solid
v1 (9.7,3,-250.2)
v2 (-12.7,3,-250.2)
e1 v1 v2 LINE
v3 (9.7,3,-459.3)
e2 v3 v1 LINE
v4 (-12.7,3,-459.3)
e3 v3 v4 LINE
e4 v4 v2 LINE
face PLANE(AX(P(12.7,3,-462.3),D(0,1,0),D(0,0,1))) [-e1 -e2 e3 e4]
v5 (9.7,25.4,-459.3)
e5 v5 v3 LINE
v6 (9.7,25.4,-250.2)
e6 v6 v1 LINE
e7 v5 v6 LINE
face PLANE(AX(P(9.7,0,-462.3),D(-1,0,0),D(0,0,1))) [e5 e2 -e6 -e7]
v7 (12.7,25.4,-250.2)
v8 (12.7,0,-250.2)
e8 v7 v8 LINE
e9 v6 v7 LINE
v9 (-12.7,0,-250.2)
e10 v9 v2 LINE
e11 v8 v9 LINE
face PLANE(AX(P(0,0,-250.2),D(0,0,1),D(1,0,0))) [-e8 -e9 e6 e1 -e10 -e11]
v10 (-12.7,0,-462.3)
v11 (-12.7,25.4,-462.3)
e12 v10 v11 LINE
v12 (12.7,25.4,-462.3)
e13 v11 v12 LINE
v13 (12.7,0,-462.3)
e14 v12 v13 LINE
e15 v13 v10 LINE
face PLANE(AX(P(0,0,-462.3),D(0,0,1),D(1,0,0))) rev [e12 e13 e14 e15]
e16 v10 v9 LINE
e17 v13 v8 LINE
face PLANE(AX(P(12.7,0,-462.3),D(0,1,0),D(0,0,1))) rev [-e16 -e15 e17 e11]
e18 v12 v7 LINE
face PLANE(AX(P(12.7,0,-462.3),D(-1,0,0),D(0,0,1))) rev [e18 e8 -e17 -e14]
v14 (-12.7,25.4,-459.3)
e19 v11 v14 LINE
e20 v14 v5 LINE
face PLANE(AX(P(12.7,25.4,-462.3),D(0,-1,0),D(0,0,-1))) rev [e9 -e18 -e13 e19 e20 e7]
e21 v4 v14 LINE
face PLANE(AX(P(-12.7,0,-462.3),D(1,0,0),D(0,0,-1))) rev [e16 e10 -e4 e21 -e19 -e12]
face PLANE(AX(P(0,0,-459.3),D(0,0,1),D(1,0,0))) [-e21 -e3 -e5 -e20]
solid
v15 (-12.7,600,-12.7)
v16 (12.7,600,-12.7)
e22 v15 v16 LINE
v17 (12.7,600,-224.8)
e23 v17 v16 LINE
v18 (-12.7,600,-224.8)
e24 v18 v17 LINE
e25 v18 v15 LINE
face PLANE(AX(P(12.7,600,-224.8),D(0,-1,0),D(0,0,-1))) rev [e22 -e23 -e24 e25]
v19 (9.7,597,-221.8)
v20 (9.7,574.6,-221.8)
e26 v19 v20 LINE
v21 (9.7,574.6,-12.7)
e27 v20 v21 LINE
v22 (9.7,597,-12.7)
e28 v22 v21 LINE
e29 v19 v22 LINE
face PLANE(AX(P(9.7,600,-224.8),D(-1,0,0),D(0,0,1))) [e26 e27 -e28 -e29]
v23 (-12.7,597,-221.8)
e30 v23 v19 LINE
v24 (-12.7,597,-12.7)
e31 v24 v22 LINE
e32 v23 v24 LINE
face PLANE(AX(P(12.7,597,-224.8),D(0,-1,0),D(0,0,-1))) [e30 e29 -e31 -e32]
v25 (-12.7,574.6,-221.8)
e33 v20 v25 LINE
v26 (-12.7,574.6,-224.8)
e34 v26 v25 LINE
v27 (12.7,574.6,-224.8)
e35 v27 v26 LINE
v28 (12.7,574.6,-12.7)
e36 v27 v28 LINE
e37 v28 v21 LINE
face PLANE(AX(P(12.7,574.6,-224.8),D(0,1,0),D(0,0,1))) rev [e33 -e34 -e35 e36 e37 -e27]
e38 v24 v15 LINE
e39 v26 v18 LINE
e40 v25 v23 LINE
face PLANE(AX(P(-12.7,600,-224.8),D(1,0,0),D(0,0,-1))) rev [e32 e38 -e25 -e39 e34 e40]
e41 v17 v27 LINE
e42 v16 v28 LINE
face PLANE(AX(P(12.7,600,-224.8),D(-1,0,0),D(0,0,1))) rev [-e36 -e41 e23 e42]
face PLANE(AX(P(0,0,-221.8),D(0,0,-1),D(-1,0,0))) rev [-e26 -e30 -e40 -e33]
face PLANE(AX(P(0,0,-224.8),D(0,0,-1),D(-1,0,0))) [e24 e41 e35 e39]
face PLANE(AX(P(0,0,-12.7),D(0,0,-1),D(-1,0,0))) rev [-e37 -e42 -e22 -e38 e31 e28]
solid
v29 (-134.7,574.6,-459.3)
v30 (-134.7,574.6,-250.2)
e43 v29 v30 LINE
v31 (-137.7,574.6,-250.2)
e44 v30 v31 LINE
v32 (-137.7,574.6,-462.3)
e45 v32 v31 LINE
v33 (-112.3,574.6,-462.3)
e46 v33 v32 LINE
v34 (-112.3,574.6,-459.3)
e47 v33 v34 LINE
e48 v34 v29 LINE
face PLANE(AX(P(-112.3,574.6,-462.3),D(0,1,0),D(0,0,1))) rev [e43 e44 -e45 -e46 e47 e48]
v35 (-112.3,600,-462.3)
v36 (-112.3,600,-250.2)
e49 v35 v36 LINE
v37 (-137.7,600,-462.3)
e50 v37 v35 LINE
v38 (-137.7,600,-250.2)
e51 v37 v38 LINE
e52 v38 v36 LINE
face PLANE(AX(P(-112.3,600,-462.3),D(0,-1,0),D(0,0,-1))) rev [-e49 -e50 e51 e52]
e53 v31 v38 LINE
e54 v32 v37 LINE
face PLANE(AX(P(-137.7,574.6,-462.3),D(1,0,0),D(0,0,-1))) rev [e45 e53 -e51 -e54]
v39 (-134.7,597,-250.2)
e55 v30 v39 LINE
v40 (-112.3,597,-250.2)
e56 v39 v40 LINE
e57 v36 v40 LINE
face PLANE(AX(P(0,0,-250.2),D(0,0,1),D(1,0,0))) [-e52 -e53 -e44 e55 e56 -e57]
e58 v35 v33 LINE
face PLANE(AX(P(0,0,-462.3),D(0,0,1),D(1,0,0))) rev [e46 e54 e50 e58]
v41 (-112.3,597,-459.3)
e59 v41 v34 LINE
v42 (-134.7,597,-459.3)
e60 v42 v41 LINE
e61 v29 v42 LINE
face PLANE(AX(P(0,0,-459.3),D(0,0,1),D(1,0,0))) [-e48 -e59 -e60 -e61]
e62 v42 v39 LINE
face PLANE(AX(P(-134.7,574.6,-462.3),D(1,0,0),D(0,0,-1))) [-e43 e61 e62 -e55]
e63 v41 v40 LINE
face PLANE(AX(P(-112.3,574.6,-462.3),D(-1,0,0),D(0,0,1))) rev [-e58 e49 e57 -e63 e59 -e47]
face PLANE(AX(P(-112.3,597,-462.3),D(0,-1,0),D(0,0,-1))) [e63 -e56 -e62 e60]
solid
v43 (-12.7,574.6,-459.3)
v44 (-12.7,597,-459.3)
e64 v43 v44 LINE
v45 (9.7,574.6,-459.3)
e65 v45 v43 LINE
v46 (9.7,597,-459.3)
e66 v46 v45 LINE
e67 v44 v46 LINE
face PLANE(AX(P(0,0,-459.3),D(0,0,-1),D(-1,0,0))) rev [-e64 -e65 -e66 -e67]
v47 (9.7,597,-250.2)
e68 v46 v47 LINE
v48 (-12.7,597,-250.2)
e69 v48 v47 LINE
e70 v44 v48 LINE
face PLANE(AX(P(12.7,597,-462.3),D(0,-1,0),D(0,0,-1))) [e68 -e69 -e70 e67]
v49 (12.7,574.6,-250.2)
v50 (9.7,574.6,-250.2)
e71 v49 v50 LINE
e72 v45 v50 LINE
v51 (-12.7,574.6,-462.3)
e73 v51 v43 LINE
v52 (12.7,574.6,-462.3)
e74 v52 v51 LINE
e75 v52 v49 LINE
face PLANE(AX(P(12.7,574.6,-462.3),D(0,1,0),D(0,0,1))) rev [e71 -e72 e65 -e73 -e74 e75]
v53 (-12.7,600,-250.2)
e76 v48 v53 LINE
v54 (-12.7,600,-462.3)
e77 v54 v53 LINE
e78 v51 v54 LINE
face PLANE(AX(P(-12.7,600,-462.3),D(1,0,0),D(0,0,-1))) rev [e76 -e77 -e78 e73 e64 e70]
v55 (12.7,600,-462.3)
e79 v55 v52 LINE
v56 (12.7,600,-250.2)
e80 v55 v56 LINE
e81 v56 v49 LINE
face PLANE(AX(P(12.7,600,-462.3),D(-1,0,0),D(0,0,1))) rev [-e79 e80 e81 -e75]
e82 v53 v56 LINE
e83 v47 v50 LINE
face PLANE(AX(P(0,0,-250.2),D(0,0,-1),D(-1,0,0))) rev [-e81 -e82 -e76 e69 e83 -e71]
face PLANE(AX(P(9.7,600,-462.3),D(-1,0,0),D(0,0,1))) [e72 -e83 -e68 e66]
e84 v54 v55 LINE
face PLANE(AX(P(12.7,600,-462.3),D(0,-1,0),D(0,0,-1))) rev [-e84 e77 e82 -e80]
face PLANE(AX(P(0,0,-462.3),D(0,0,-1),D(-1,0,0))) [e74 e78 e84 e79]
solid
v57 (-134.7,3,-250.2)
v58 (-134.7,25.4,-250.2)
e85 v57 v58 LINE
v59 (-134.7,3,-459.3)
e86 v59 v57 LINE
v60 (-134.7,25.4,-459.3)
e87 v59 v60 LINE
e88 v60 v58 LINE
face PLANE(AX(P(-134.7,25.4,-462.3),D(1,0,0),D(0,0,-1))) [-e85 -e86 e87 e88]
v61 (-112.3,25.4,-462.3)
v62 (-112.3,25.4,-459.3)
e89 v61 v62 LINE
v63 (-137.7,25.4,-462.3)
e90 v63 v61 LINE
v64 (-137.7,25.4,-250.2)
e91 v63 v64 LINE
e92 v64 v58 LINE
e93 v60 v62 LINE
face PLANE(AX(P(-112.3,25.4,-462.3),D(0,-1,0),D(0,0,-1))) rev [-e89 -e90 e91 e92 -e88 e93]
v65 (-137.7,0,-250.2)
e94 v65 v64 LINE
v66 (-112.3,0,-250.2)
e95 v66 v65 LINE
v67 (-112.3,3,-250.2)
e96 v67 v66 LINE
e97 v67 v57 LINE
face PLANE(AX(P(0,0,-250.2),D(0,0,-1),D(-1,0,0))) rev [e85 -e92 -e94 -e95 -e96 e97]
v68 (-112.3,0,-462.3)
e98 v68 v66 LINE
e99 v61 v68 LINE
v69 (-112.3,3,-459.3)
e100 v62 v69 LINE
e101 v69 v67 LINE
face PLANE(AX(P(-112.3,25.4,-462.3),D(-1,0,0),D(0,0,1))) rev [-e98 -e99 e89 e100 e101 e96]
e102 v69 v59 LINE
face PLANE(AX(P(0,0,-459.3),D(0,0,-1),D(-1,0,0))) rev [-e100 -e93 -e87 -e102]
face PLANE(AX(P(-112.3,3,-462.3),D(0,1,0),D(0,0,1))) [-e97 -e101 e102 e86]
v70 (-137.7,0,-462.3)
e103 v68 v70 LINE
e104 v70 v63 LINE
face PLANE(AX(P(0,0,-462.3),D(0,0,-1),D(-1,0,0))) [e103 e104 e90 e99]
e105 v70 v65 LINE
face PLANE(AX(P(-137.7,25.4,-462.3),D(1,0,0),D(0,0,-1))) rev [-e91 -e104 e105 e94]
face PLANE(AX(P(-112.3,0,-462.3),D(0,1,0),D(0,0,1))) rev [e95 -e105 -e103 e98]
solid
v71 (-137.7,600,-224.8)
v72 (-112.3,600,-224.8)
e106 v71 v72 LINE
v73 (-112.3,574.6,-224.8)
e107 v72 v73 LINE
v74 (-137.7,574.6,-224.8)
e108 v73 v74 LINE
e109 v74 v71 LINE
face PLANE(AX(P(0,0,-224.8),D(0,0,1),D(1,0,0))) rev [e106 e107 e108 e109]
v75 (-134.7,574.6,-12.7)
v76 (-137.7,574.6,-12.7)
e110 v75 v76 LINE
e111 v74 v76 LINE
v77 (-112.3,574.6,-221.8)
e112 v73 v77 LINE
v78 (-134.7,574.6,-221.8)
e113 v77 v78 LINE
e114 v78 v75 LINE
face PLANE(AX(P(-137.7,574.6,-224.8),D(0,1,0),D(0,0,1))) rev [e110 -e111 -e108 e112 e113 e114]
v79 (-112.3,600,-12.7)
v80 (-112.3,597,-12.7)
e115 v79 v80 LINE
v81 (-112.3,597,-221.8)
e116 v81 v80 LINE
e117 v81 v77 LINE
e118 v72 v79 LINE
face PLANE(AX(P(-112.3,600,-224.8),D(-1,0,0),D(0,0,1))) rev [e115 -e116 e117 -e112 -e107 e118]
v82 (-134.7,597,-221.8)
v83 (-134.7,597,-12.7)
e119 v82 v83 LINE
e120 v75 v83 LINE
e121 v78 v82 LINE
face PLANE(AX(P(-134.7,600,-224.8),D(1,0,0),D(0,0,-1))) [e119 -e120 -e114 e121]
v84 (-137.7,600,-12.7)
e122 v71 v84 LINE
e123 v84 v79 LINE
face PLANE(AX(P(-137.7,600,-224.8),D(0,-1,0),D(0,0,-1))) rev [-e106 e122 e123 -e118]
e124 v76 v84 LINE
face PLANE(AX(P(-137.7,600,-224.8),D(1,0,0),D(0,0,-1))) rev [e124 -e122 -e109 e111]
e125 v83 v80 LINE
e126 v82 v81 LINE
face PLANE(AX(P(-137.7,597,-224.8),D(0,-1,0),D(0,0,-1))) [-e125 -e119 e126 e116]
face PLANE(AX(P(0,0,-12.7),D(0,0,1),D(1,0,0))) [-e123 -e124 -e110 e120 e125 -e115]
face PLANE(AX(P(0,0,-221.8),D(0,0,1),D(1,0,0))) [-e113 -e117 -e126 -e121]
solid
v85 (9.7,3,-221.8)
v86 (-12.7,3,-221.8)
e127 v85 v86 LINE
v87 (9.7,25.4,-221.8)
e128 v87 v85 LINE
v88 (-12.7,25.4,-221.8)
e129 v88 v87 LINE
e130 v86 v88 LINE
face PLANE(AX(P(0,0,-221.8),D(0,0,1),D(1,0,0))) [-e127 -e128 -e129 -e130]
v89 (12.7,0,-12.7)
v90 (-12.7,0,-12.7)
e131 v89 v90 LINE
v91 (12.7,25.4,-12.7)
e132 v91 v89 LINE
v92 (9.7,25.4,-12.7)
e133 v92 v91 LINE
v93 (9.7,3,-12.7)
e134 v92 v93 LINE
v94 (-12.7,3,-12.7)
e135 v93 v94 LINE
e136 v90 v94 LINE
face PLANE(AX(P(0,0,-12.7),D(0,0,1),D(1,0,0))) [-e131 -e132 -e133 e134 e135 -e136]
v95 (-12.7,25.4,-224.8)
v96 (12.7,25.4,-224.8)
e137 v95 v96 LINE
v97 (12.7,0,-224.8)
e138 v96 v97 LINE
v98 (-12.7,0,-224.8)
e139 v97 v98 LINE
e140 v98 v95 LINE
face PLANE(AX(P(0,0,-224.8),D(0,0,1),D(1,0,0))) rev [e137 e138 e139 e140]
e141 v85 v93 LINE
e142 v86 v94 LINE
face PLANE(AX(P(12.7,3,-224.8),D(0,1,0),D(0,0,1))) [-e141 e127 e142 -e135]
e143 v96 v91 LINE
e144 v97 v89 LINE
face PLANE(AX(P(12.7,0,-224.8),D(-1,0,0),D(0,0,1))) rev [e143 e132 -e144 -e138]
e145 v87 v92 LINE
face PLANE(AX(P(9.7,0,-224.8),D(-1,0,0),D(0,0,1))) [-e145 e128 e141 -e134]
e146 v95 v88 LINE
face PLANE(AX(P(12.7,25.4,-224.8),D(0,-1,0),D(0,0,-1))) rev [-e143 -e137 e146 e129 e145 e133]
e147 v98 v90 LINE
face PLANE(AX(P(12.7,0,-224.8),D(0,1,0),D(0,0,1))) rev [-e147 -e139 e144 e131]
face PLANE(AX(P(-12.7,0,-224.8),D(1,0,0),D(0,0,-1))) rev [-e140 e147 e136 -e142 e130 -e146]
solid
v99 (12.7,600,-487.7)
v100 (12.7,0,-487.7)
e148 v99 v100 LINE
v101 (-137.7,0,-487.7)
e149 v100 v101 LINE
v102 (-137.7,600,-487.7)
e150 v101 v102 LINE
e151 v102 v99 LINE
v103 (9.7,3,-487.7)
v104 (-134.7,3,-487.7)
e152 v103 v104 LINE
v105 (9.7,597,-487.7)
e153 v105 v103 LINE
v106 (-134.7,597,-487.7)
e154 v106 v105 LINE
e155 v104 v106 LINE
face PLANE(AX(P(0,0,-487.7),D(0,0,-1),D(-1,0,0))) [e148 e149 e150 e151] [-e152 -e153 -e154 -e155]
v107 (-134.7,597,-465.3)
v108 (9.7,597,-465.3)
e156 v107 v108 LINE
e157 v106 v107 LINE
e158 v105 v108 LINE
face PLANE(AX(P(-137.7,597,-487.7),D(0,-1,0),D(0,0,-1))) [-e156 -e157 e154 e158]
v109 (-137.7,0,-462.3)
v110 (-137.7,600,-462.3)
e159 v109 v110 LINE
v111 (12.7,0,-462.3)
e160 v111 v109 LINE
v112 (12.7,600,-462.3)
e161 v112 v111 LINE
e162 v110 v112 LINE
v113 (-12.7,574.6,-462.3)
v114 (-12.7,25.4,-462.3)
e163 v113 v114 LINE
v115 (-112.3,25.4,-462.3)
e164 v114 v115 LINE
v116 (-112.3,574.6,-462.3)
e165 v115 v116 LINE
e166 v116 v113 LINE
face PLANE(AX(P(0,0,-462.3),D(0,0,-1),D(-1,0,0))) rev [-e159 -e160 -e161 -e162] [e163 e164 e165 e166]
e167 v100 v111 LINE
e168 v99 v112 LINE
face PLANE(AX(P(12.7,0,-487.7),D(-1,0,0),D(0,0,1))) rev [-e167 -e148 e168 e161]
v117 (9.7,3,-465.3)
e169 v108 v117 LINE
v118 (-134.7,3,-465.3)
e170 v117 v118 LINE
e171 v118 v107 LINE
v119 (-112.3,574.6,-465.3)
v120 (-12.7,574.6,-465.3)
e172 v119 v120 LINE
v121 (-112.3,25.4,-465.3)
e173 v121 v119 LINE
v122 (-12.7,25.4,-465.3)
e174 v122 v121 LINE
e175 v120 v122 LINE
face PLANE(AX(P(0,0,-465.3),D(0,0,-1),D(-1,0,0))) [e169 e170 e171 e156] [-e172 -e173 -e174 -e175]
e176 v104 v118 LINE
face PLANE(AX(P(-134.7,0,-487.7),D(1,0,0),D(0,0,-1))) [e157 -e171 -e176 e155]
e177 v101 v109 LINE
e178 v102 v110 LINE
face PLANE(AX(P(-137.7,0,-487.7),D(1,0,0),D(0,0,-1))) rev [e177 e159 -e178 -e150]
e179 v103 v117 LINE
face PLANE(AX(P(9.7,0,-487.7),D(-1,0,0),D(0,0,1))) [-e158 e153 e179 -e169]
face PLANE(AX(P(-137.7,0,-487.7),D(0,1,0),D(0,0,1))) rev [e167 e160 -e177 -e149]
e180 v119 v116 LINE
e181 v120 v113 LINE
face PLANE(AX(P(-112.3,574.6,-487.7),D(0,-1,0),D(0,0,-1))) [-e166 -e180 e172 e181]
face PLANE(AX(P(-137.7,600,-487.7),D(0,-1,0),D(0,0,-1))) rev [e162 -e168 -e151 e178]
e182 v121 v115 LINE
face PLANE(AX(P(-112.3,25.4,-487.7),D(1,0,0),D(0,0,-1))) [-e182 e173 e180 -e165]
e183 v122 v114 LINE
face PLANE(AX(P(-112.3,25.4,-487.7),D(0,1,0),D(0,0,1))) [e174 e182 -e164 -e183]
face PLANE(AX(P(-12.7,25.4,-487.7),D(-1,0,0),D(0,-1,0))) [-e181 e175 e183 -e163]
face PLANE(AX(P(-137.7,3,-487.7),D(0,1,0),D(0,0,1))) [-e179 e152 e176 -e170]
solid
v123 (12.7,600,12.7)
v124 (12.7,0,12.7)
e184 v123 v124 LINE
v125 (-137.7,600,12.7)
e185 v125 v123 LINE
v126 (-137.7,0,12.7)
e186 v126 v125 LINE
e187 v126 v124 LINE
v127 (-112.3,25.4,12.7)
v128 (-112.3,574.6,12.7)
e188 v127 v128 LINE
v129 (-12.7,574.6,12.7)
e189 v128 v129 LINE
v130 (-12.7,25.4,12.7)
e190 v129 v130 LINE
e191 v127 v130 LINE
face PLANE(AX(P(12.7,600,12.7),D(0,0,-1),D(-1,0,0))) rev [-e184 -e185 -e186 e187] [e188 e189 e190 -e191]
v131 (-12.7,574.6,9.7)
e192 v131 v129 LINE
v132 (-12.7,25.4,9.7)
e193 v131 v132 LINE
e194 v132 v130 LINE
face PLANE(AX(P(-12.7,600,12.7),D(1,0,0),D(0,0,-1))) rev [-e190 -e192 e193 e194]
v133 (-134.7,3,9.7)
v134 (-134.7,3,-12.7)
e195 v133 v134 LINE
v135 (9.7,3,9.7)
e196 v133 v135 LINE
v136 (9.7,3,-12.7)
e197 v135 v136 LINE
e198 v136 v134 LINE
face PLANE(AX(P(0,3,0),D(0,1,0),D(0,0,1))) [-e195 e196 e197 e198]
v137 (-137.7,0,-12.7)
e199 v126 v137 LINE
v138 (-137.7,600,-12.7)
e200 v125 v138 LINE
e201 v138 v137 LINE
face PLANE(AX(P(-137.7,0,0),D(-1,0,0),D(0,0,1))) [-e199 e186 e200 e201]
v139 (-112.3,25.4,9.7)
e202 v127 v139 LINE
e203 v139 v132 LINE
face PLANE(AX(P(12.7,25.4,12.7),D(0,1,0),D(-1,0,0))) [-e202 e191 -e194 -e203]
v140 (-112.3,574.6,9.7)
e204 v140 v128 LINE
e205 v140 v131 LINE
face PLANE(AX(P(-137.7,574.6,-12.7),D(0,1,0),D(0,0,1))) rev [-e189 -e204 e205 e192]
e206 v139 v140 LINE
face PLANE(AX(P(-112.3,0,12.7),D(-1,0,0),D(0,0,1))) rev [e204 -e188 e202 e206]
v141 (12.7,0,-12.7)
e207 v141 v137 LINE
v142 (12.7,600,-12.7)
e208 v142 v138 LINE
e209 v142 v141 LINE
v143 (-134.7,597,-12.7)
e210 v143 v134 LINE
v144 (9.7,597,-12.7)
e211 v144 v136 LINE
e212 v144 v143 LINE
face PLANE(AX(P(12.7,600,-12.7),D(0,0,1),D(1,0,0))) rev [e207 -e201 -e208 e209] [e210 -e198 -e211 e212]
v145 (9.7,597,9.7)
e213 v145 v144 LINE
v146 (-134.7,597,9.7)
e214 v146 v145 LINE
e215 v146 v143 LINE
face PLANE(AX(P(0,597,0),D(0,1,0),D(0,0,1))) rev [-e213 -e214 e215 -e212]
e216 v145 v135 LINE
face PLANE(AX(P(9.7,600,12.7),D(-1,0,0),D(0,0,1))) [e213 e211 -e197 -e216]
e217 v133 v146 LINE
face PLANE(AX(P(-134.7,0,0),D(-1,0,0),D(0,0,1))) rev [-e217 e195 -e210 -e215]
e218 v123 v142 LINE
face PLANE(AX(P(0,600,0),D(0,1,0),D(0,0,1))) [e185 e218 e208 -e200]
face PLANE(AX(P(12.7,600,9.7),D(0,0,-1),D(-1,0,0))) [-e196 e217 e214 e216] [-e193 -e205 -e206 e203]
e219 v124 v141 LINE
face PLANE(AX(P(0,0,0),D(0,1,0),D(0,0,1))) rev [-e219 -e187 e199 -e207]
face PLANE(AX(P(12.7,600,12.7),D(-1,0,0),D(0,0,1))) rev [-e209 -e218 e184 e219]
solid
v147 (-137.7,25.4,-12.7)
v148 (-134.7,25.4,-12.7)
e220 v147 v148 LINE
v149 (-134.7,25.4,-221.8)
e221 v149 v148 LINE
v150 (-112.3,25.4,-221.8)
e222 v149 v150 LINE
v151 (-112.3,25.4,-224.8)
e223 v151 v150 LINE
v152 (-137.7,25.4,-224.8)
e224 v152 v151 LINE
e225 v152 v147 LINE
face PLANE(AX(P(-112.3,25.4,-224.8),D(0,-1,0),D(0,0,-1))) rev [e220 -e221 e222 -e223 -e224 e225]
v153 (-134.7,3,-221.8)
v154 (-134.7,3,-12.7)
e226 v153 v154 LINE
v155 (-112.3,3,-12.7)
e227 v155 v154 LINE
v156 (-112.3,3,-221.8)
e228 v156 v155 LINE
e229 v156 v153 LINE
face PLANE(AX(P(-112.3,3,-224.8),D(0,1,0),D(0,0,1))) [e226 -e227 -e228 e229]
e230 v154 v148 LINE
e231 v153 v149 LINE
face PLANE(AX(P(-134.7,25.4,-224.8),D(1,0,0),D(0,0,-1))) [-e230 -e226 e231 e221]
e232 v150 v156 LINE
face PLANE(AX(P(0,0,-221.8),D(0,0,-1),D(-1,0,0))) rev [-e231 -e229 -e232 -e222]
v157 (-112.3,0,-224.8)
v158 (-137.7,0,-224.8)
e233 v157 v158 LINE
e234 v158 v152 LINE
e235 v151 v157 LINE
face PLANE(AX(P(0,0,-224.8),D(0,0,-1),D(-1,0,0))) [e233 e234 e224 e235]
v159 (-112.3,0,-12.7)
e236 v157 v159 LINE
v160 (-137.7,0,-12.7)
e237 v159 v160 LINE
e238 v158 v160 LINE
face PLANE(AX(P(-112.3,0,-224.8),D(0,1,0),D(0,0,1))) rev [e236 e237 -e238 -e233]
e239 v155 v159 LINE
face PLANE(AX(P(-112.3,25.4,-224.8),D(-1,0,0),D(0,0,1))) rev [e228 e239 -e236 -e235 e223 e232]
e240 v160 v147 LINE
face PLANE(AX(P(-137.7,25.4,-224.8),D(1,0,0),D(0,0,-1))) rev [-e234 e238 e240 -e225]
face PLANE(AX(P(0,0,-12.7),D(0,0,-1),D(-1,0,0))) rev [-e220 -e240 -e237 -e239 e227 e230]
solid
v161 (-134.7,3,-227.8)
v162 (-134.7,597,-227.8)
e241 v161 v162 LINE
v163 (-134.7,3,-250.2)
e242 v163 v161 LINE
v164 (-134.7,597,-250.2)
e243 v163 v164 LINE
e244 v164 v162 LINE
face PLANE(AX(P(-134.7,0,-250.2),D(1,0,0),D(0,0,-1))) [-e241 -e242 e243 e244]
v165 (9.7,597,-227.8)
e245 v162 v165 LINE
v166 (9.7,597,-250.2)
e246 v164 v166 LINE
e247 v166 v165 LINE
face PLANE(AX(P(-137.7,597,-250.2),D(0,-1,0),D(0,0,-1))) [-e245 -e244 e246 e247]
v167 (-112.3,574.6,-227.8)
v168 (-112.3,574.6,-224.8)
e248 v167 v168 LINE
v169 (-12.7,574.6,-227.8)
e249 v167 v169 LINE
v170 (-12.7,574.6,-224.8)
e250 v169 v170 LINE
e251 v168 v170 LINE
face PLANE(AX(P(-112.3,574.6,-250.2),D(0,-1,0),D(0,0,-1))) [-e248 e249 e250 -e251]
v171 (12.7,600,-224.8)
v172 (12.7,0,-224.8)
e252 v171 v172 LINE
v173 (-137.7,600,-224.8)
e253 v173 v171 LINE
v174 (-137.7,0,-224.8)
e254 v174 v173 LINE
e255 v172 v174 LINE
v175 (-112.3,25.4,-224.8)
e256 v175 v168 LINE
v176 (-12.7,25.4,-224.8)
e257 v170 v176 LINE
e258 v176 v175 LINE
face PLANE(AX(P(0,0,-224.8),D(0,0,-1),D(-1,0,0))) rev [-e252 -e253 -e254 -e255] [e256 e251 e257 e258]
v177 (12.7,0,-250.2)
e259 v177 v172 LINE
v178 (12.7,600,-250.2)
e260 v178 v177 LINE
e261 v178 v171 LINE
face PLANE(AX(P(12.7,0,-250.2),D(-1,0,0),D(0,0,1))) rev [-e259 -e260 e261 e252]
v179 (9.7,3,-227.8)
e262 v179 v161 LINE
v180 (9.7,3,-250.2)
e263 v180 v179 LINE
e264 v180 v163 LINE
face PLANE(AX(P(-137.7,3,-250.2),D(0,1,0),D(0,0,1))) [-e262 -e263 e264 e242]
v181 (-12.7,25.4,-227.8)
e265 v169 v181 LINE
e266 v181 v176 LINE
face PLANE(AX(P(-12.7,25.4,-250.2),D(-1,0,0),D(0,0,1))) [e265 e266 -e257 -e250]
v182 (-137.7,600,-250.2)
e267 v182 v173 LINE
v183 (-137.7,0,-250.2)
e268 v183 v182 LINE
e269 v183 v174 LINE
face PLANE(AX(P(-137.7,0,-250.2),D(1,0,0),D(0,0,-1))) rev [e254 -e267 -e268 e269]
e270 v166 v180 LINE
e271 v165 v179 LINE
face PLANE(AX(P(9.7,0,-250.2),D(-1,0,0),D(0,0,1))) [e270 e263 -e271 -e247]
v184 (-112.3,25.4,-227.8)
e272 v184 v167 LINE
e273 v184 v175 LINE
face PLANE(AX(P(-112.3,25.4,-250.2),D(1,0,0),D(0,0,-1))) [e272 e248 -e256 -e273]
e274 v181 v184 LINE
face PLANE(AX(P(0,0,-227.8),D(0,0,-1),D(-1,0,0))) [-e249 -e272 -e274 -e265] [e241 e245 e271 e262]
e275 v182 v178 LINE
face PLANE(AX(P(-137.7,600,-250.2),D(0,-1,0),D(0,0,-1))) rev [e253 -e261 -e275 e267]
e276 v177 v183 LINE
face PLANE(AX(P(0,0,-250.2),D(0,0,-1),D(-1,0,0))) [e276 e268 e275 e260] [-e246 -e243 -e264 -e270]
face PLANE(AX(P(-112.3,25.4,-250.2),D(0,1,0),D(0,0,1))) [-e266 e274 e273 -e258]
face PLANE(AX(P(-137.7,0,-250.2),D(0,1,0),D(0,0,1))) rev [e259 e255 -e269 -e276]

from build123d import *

# Parameters (mm, degrees)
SKETCH1_W             = 25.4
SKETCH1_H             = 25.4
BOSS_EXTRUDE1_DEPTH   = 600
SKETCH2_W             = 25.4
SKETCH2_H             = 25.4
BOSS_EXTRUDE2_DEPTH   = 125
SKETCH3_W             = 25.4
SKETCH3_H             = 25.4
BOSS_EXTRUDE3_DEPTH   = 574.6
SKETCH4_W             = 150.4
SKETCH4_H             = 25.4
BOSS_EXTRUDE4_DEPTH   = 25.4
SKETCH5_W             = 25.4
SKETCH5_H             = 25.4
BOSS_EXTRUDE5_DEPTH   = 212.1
BOSS_EXTRUDE5_2_DEPTH = 212.1
BOSS_EXTRUDE5_3_DEPTH = 212.1
BOSS_EXTRUDE5_4_DEPTH = 212.1
SKETCH6_W             = 150.4
SKETCH6_H             = 600
SKETCH6_W_2           = 99.6
SKETCH6_H_2           = 549.2
BOSS_EXTRUDE6_DEPTH   = 25.4
SKETCH7_W             = 25.4
SKETCH7_H             = 25.4
BOSS_EXTRUDE7_DEPTH   = 212.1
BOSS_EXTRUDE7_2_DEPTH = 212.1
BOSS_EXTRUDE7_3_DEPTH = 212.1
BOSS_EXTRUDE7_4_DEPTH = 212.1
SKETCH9_W             = 150.4
SKETCH9_H             = 600
SKETCH9_W_2           = 99.6
SKETCH9_H_2           = 549.2
BOSS_EXTRUDE8_DEPTH   = 25.4
SHELL2_T              = -3
SHELL3_T              = -3
SHELL4_T              = -3
SHELL5_T              = -3
SHELL6_T              = -3
SHELL7_T              = -3
SHELL8_T              = -3
SHELL9_T              = -3
SHELL10_T             = -3
SHELL11_T             = -3
SHELL12_T             = -3


with BuildPart() as part:
    # Sketch1 → Boss-Extrude1 (new body)
    with BuildSketch(Plane(origin=(0, 0, 0), x_dir=(1, 0, 0), z_dir=(0, 1, 0))):
        Rectangle(SKETCH1_W, SKETCH1_H)
    extrude(amount=BOSS_EXTRUDE1_DEPTH)

    # Sketch2 → Boss-Extrude2 (add)
    with BuildSketch(Plane.ZY.offset(12.7)):
        with Locations((0, 587.3)):
            Rectangle(SKETCH2_W, SKETCH2_H)
    extrude(amount=BOSS_EXTRUDE2_DEPTH)

    # Sketch3 → Boss-Extrude3 (add)
    with BuildSketch(Plane(origin=(0, 574.6, 0), x_dir=(-1, 0, 0), z_dir=(0, -1, 0))):
        with Locations((125, 0)):
            Rectangle(SKETCH3_W, SKETCH3_H)
    extrude(amount=BOSS_EXTRUDE3_DEPTH)

    # Sketch4 → Boss-Extrude4 (add)
    with BuildSketch(Plane(origin=(0, 0, -12.7), x_dir=(-1, 0, 0), z_dir=(0, 0, -1))):
        with Locations((62.5, 12.7)):
            Rectangle(SKETCH4_W, SKETCH4_H)
    extrude(amount=-BOSS_EXTRUDE4_DEPTH)

    # Shell2
    shell2_openings = [part.faces().sort_by_distance(p)[0] for p in [
        (-112.3, 300, 0),
        (-62.5, 574.6, 0),
        (-62.5, 25.4, 0),
        (-12.7, 300, 0),
        (-62.5, 6.185629798, -12.7),
    ]]
    offset(amount=SHELL2_T, openings=shell2_openings, kind=Kind.INTERSECTION)


with BuildPart() as body_2:
    # Sketch5 → Boss-Extrude5 (new body)
    with BuildSketch(Plane(origin=(0, 0, -12.7), x_dir=(-1, 0, 0), z_dir=(0, 0, -1))):
        with Locations((0, 587.3)):
            Rectangle(SKETCH5_W, SKETCH5_H)
    extrude(amount=BOSS_EXTRUDE5_DEPTH)

    # Shell3
    shell3_openings = [body_2.faces().sort_by_distance(p)[0] for p in [
        (0, 587.3, -12.7),
        (0, 574.6, -118.75),
        (-12.7, 587.3, -118.75),
    ]]
    offset(amount=SHELL3_T, openings=shell3_openings, kind=Kind.INTERSECTION)


with BuildPart() as body_3:
    # Sketch5 → Boss-Extrude5 2 (new body)
    with BuildSketch(Plane(origin=(0, 0, -12.7), x_dir=(-1, 0, 0), z_dir=(0, 0, -1))):
        with Locations((125, 587.3)):
            Rectangle(SKETCH5_W, SKETCH5_H)
    extrude(amount=BOSS_EXTRUDE5_2_DEPTH)

    # Shell4
    shell4_openings = [body_3.faces().sort_by_distance(p)[0] for p in [
        (-125, 587.3, -12.7),
        (-112.3, 587.3, -118.75),
        (-125, 574.6, -118.75),
    ]]
    offset(amount=SHELL4_T, openings=shell4_openings, kind=Kind.INTERSECTION)


with BuildPart() as body_4:
    # Sketch5 → Boss-Extrude5 3 (new body)
    with BuildSketch(Plane(origin=(0, 0, -12.7), x_dir=(-1, 0, 0), z_dir=(0, 0, -1))):
        with Locations((0, 12.7)):
            Rectangle(SKETCH5_W, SKETCH5_H)
    extrude(amount=BOSS_EXTRUDE5_3_DEPTH)

    # Shell5
    shell5_openings = [body_4.faces().sort_by_distance(p)[0] for p in [
        (0, 12.7, -12.7),
        (-12.7, 12.7, -118.75),
        (0, 25.4, -118.75),
    ]]
    offset(amount=SHELL5_T, openings=shell5_openings, kind=Kind.INTERSECTION)


with BuildPart() as body_5:
    # Sketch5 → Boss-Extrude5 4 (new body)
    with BuildSketch(Plane(origin=(0, 0, -12.7), x_dir=(-1, 0, 0), z_dir=(0, 0, -1))):
        with Locations((125, 12.7)):
            Rectangle(SKETCH5_W, SKETCH5_H)
    extrude(amount=BOSS_EXTRUDE5_4_DEPTH)

    # Shell6
    shell6_openings = [body_5.faces().sort_by_distance(p)[0] for p in [
        (-125, 12.7, -12.7),
        (-112.3, 12.7, -118.75),
        (-125, 25.4, -118.75),
    ]]
    offset(amount=SHELL6_T, openings=shell6_openings, kind=Kind.INTERSECTION)


with BuildPart() as body_6:
    # Sketch6 → Boss-Extrude6 (new body)
    with BuildSketch(Plane(origin=(0, 0, -224.8), x_dir=(-1, 0, 0), z_dir=(0, 0, -1))):
        with Locations((62.5, 300)):
            Rectangle(SKETCH6_W, SKETCH6_H)
        with Locations((62.5, 300)):
            Rectangle(SKETCH6_W_2, SKETCH6_H_2, mode=Mode.SUBTRACT)
    extrude(amount=BOSS_EXTRUDE6_DEPTH)

    # Shell7
    shell7_openings = [body_6.faces().sort_by_distance(p)[0] for p in [
        (-62.5, 6.185629798, -250.2),
        (-112.3, 300, -237.5),
        (-62.5, 25.4, -237.5),
        (-12.7, 300, -237.5),
        (-62.5, 574.6, -237.5),
    ]]
    offset(amount=SHELL7_T, openings=shell7_openings, kind=Kind.INTERSECTION)


with BuildPart() as body_7:
    # Sketch7 → Boss-Extrude7 (new body)
    with BuildSketch(Plane(origin=(0, 0, -250.2), x_dir=(-1, 0, 0), z_dir=(0, 0, -1))):
        with Locations((0, 587.3)):
            Rectangle(SKETCH7_W, SKETCH7_H)
    extrude(amount=BOSS_EXTRUDE7_DEPTH)

    # Shell9
    shell9_openings = [body_7.faces().sort_by_distance(p)[0] for p in [
        (0, 587.3, -250.2),
        (-12.7, 587.3, -356.25),
        (0, 574.6, -356.25),
    ]]
    offset(amount=SHELL9_T, openings=shell9_openings, kind=Kind.INTERSECTION)


with BuildPart() as body_8:
    # Sketch7 → Boss-Extrude7 2 (new body)
    with BuildSketch(Plane(origin=(0, 0, -250.2), x_dir=(-1, 0, 0), z_dir=(0, 0, -1))):
        with Locations((125, 587.3)):
            Rectangle(SKETCH7_W, SKETCH7_H)
    extrude(amount=BOSS_EXTRUDE7_2_DEPTH)

    # Shell8
    shell8_openings = [body_8.faces().sort_by_distance(p)[0] for p in [
        (-125, 574.6, -356.25),
        (-112.3, 587.3, -356.25),
        (-125, 587.3, -250.2),
    ]]
    offset(amount=SHELL8_T, openings=shell8_openings, kind=Kind.INTERSECTION)


with BuildPart() as body_9:
    # Sketch7 → Boss-Extrude7 3 (new body)
    with BuildSketch(Plane(origin=(0, 0, -250.2), x_dir=(-1, 0, 0), z_dir=(0, 0, -1))):
        with Locations((0, 12.7)):
            Rectangle(SKETCH7_W, SKETCH7_H)
    extrude(amount=BOSS_EXTRUDE7_3_DEPTH)

    # Shell10
    shell10_openings = [body_9.faces().sort_by_distance(p)[0] for p in [
        (0, 25.4, -356.25),
        (-12.7, 12.7, -356.25),
        (0, 12.7, -250.2),
    ]]
    offset(amount=SHELL10_T, openings=shell10_openings, kind=Kind.INTERSECTION)


with BuildPart() as body_10:
    # Sketch7 → Boss-Extrude7 4 (new body)
    with BuildSketch(Plane(origin=(0, 0, -250.2), x_dir=(-1, 0, 0), z_dir=(0, 0, -1))):
        with Locations((125, 12.7)):
            Rectangle(SKETCH7_W, SKETCH7_H)
    extrude(amount=BOSS_EXTRUDE7_4_DEPTH)

    # Shell11
    shell11_openings = [body_10.faces().sort_by_distance(p)[0] for p in [
        (-125, 12.7, -250.2),
        (-125, 25.4, -356.25),
        (-112.3, 12.7, -356.25),
    ]]
    offset(amount=SHELL11_T, openings=shell11_openings, kind=Kind.INTERSECTION)


with BuildPart() as body_11:
    # Sketch9 → Boss-Extrude8 (new body)
    with BuildSketch(Plane(origin=(0, 0, -462.3), x_dir=(-1, 0, 0), z_dir=(0, 0, -1))):
        with Locations((62.5, 300)):
            Rectangle(SKETCH9_W, SKETCH9_H)
        with Locations((62.5, 300)):
            Rectangle(SKETCH9_W_2, SKETCH9_H_2, mode=Mode.SUBTRACT)
    extrude(amount=BOSS_EXTRUDE8_DEPTH)

    # Shell12
    shell12_openings = [body_11.faces().sort_by_distance(p)[0] for p in [
        (-62.5, 574.6, -475),
        (-112.3, 300, -475),
        (-62.5, 25.4, -475),
        (-62.5, 6.185629798, -487.7),
        (-12.7, 300, -475),
    ]]
    offset(amount=SHELL12_T, openings=shell12_openings, kind=Kind.INTERSECTION)


solid = Compound([part.part, body_2.part, body_3.part, body_4.part, body_5.part, body_6.part, body_7.part, body_8.part, body_9.part, body_10.part, body_11.part])
